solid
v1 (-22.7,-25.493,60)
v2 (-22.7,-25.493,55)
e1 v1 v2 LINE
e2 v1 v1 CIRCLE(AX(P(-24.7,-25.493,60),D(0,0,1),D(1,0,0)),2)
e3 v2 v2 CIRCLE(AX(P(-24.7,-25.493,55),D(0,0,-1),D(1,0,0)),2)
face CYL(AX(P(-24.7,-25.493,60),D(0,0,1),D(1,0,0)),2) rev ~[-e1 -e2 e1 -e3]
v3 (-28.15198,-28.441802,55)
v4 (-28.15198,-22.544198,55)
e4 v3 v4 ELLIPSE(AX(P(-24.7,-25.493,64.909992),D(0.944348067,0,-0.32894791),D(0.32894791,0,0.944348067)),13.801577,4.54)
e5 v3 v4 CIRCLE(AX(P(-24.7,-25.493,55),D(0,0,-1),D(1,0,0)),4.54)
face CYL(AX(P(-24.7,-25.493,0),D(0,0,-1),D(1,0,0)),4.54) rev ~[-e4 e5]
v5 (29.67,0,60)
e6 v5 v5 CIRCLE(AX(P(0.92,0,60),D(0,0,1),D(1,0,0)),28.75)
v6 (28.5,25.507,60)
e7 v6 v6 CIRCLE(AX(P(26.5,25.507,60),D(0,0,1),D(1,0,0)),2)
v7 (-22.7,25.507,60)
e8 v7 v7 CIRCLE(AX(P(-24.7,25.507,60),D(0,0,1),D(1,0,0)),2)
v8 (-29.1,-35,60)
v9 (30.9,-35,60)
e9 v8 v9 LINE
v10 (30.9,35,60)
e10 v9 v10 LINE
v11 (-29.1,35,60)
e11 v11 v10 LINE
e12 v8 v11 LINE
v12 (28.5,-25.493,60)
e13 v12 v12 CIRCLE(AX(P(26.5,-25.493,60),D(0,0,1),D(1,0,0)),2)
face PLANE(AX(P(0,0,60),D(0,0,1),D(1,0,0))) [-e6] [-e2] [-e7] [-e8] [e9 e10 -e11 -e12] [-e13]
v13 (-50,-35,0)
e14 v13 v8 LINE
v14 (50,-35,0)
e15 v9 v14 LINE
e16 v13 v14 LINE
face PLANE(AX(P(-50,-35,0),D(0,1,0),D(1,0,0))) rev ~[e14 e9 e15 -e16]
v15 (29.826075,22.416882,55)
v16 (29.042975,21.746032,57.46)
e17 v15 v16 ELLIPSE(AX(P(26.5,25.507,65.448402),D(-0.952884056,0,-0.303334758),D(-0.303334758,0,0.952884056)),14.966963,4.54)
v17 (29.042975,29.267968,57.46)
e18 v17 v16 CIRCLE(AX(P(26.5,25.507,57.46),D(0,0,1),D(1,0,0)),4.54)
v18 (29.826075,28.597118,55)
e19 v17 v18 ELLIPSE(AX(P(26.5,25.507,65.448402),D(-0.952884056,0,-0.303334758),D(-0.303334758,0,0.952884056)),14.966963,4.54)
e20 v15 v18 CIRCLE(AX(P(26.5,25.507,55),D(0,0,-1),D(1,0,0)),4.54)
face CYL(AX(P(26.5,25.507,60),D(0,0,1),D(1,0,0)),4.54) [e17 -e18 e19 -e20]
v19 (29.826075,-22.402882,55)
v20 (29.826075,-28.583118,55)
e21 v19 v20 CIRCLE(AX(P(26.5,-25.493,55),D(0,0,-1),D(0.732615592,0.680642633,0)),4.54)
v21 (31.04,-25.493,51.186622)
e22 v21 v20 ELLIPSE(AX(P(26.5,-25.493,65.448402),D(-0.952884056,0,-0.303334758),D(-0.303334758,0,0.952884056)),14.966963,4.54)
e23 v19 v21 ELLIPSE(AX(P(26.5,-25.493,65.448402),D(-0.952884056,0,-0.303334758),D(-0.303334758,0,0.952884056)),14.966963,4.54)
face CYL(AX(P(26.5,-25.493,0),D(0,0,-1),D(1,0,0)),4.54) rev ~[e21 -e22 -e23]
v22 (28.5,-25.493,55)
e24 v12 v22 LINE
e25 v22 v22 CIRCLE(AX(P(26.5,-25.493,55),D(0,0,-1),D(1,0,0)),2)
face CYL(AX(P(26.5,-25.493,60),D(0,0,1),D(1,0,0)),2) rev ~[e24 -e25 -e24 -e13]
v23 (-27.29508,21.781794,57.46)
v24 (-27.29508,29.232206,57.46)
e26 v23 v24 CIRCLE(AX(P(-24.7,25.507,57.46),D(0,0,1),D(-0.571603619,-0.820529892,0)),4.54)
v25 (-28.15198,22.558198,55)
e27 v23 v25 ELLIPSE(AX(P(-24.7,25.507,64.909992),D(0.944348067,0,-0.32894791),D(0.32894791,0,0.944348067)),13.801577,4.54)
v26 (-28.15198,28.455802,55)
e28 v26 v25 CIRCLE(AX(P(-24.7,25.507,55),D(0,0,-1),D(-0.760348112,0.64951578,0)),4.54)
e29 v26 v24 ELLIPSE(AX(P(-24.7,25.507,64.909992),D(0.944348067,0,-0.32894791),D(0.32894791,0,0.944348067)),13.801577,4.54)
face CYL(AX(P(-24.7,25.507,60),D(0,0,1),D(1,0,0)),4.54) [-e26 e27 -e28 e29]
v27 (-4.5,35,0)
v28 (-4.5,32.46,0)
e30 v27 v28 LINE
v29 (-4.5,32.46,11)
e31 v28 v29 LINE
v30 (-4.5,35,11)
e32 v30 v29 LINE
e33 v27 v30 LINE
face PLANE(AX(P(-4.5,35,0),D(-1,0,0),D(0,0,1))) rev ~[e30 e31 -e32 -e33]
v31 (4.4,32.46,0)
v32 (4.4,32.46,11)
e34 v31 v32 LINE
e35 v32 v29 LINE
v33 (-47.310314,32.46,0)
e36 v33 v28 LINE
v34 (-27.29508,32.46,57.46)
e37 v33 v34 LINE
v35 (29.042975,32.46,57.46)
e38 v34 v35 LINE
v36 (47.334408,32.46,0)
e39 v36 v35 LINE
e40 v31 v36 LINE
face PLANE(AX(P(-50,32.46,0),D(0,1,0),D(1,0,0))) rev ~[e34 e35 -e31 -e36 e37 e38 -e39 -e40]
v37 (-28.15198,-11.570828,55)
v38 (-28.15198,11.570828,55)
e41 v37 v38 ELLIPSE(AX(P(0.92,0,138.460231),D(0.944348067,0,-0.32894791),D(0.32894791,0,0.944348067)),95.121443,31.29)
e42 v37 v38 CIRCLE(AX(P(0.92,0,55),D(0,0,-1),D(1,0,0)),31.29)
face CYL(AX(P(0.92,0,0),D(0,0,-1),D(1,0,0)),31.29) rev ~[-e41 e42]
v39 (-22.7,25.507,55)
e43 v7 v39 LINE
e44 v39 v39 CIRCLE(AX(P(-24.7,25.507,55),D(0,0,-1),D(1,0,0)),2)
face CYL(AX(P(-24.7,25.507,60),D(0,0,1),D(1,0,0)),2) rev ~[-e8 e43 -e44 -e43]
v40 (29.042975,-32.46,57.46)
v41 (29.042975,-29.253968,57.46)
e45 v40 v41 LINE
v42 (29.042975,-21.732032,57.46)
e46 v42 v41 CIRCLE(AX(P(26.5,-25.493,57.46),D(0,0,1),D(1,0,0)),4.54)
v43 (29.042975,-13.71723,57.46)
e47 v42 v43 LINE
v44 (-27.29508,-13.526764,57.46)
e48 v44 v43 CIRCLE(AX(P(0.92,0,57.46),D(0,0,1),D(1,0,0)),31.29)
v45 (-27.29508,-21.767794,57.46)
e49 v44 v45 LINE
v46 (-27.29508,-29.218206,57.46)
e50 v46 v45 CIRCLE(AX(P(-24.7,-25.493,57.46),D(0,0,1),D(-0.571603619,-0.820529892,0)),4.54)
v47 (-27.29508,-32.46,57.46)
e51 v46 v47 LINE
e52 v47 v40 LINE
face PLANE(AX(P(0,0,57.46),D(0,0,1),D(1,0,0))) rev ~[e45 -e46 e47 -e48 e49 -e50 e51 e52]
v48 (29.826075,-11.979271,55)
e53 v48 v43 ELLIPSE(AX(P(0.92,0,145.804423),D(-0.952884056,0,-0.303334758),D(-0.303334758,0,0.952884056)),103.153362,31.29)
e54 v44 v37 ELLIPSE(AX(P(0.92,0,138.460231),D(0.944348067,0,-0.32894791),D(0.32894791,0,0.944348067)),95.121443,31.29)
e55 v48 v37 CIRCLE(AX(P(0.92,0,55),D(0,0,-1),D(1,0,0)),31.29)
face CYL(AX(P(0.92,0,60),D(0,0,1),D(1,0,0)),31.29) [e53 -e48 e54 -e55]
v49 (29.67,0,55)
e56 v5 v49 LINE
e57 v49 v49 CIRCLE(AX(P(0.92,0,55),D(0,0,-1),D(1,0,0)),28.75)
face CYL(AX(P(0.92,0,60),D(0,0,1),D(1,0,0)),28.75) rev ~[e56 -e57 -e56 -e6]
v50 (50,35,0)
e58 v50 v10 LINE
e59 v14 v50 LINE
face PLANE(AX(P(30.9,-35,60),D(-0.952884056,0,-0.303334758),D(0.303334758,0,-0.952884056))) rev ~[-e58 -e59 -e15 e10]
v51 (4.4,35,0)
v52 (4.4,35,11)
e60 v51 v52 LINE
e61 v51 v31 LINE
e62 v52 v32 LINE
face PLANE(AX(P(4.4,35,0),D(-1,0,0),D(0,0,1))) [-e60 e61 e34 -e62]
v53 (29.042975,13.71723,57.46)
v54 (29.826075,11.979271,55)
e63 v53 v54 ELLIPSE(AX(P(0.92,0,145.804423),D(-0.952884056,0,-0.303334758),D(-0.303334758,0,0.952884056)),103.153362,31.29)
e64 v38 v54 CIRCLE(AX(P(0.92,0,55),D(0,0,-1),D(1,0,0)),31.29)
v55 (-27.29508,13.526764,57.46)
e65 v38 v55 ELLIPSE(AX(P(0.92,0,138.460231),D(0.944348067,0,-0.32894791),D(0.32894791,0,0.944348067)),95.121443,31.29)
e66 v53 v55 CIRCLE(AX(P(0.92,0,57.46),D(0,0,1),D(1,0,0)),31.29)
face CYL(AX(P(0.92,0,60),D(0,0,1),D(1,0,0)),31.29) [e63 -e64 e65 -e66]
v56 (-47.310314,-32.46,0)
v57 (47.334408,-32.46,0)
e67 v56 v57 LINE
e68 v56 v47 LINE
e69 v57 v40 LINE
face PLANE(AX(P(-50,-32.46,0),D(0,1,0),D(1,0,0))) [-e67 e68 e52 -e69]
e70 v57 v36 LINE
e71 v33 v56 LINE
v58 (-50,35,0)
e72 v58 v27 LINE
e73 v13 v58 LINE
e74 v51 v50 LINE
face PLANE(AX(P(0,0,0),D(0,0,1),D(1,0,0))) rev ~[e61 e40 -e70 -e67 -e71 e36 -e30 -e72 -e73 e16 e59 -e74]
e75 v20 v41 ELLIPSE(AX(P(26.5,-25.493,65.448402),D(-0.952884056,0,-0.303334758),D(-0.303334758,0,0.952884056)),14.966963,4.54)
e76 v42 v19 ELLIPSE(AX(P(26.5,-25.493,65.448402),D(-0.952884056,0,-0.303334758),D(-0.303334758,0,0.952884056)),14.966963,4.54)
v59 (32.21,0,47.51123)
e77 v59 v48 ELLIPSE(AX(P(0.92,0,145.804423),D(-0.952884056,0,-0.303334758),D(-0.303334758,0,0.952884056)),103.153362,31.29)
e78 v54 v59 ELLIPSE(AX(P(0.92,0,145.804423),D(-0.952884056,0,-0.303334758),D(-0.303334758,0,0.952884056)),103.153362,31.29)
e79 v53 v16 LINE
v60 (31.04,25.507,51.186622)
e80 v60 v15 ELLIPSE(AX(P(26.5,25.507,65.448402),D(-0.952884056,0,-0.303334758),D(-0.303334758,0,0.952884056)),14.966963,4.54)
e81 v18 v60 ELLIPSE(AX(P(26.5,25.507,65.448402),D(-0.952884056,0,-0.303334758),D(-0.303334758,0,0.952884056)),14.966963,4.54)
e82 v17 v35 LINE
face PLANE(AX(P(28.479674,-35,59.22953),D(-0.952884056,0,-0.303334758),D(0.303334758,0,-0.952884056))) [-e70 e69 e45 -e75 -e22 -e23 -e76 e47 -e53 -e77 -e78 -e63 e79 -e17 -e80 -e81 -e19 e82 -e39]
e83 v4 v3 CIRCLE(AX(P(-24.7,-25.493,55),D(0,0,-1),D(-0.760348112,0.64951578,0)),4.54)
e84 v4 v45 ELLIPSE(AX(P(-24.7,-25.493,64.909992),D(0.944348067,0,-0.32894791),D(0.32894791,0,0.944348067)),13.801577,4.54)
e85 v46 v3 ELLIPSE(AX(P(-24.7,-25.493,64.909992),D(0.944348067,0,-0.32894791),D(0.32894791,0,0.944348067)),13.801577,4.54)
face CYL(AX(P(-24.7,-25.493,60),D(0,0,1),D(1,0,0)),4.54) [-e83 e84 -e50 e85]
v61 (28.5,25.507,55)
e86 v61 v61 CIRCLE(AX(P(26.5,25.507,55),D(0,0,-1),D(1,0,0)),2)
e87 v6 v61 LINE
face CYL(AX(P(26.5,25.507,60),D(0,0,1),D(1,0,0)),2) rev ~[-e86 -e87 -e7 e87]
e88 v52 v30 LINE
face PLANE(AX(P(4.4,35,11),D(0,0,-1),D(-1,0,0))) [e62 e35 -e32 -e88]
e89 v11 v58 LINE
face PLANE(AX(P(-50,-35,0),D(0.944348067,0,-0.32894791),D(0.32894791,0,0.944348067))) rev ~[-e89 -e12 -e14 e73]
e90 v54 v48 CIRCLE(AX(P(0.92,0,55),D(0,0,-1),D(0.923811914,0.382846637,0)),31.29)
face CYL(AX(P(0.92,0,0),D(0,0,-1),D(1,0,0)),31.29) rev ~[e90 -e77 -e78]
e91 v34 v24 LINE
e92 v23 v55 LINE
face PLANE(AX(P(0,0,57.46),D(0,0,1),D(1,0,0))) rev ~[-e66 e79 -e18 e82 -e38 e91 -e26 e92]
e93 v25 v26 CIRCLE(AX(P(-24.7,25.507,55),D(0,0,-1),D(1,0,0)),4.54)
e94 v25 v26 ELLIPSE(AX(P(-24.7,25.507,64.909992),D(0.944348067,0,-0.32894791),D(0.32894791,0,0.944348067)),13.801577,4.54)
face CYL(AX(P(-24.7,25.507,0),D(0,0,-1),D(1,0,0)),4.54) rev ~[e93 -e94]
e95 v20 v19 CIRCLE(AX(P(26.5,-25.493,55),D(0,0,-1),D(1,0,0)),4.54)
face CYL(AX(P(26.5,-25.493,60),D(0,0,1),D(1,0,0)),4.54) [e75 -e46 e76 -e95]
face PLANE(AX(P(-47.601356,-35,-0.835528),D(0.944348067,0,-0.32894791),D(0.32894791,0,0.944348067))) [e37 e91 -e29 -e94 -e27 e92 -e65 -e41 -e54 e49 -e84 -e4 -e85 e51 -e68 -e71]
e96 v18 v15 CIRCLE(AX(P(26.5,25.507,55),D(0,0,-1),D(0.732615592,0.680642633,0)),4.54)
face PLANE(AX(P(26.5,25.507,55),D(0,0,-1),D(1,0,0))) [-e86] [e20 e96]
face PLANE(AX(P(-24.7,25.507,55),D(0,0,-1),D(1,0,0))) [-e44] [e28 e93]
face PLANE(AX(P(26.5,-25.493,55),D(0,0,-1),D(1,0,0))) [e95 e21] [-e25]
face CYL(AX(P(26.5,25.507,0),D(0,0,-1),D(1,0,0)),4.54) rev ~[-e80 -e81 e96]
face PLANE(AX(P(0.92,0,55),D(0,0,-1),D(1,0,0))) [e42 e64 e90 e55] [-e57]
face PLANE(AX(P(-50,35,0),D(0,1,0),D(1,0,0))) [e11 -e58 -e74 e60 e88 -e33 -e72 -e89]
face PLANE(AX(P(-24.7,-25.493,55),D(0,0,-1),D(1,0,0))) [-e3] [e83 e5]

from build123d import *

# Parameters (mm, degrees)
F0_W      = 100
F0_H      = 70
F1_DEPTH  = 60
F3_DEPTH  = 70.001
F4_R      = 2
F5_DEPTH  = 60.001
F6_R      = 28.75
F7_DEPTH  = 60.001
F8_T      = -2.54
F9_R      = 31.29
F9_R_2    = 28.75
F9_R_3    = 4.54
F9_R_4    = 2
F10_DEPTH = 55
F11_W     = 8.9
F11_H     = 11
F12_DEPTH = 25.4


with BuildPart() as f1:
    # F0 (on Top) → F1 (new body)
    with BuildSketch(Plane.XY):
        Rectangle(F0_W, F0_H)
    extrude(amount=F1_DEPTH)

    # F2 (on face) → F3 (cut, through all)
    with BuildSketch(Plane.XZ.offset(35)):
        Polygon((-50, 60), (-50, 0), (-29.1, 60), align=None)
        Polygon((30.9, 60), (50, 0), (50, 60), align=None)
    extrude(amount=-F3_DEPTH, mode=Mode.SUBTRACT)

    # F4 (on face) → F5 (cut, through all)
    with BuildSketch(Plane.XY.offset(60)):
        with Locations((-24.7, 25.507)):
            Circle(F4_R)
        with Locations((26.5, 25.507)):
            Circle(F4_R)
        with Locations((26.5, -25.493)):
            Circle(F4_R)
        with Locations((-24.7, -25.493)):
            Circle(F4_R)
    extrude(amount=-F5_DEPTH, mode=Mode.SUBTRACT)

    # F6 (on face) → F7 (cut, through all)
    with BuildSketch(Plane.XY.offset(60)):
        with Locations((0.92, 0)):
            Circle(F6_R)
    extrude(amount=-F7_DEPTH, mode=Mode.SUBTRACT)

    # F8
    f8_openings = [f1.faces().sort_by_distance(p)[0] for p in [
        (0, 33.779344, 0),
    ]]
    offset(amount=F8_T, openings=f8_openings)

    # F9 (on face) → F10 (cut)
    with BuildSketch(Plane(origin=(0, 0, 0), x_dir=(1, 0, 0), z_dir=(0, 0, -1))):
        with Locations((0.92, 0)):
            Circle(F9_R)
        with Locations((0.92, 0)):
            Circle(F9_R_2, mode=Mode.SUBTRACT)
        with Locations((-24.7, 25.493)):
            Circle(F9_R_3)
        with Locations((-24.7, 25.493)):
            Circle(F9_R_4, mode=Mode.SUBTRACT)
        with Locations((26.5, 25.493)):
            Circle(F9_R_3)
        with Locations((26.5, 25.493)):
            Circle(F9_R_4, mode=Mode.SUBTRACT)
        with Locations((26.5, -25.507)):
            Circle(F9_R_3)
        with Locations((26.5, -25.507)):
            Circle(F9_R_4, mode=Mode.SUBTRACT)
        with Locations((-24.7, -25.507)):
            Circle(F9_R_3)
        with Locations((-24.7, -25.507)):
            Circle(F9_R_4, mode=Mode.SUBTRACT)
    extrude(amount=-F10_DEPTH, mode=Mode.SUBTRACT)

    # F11 (on face) → F12 (cut)
    with BuildSketch(Plane(origin=(0, 35, 0), x_dir=(-1, 0, 0), z_dir=(0, 1, 0))):
        with Locations((0.05, 5.5)):
            Rectangle(F11_W, F11_H)
    extrude(amount=-F12_DEPTH, mode=Mode.SUBTRACT)


solid = f1.part
